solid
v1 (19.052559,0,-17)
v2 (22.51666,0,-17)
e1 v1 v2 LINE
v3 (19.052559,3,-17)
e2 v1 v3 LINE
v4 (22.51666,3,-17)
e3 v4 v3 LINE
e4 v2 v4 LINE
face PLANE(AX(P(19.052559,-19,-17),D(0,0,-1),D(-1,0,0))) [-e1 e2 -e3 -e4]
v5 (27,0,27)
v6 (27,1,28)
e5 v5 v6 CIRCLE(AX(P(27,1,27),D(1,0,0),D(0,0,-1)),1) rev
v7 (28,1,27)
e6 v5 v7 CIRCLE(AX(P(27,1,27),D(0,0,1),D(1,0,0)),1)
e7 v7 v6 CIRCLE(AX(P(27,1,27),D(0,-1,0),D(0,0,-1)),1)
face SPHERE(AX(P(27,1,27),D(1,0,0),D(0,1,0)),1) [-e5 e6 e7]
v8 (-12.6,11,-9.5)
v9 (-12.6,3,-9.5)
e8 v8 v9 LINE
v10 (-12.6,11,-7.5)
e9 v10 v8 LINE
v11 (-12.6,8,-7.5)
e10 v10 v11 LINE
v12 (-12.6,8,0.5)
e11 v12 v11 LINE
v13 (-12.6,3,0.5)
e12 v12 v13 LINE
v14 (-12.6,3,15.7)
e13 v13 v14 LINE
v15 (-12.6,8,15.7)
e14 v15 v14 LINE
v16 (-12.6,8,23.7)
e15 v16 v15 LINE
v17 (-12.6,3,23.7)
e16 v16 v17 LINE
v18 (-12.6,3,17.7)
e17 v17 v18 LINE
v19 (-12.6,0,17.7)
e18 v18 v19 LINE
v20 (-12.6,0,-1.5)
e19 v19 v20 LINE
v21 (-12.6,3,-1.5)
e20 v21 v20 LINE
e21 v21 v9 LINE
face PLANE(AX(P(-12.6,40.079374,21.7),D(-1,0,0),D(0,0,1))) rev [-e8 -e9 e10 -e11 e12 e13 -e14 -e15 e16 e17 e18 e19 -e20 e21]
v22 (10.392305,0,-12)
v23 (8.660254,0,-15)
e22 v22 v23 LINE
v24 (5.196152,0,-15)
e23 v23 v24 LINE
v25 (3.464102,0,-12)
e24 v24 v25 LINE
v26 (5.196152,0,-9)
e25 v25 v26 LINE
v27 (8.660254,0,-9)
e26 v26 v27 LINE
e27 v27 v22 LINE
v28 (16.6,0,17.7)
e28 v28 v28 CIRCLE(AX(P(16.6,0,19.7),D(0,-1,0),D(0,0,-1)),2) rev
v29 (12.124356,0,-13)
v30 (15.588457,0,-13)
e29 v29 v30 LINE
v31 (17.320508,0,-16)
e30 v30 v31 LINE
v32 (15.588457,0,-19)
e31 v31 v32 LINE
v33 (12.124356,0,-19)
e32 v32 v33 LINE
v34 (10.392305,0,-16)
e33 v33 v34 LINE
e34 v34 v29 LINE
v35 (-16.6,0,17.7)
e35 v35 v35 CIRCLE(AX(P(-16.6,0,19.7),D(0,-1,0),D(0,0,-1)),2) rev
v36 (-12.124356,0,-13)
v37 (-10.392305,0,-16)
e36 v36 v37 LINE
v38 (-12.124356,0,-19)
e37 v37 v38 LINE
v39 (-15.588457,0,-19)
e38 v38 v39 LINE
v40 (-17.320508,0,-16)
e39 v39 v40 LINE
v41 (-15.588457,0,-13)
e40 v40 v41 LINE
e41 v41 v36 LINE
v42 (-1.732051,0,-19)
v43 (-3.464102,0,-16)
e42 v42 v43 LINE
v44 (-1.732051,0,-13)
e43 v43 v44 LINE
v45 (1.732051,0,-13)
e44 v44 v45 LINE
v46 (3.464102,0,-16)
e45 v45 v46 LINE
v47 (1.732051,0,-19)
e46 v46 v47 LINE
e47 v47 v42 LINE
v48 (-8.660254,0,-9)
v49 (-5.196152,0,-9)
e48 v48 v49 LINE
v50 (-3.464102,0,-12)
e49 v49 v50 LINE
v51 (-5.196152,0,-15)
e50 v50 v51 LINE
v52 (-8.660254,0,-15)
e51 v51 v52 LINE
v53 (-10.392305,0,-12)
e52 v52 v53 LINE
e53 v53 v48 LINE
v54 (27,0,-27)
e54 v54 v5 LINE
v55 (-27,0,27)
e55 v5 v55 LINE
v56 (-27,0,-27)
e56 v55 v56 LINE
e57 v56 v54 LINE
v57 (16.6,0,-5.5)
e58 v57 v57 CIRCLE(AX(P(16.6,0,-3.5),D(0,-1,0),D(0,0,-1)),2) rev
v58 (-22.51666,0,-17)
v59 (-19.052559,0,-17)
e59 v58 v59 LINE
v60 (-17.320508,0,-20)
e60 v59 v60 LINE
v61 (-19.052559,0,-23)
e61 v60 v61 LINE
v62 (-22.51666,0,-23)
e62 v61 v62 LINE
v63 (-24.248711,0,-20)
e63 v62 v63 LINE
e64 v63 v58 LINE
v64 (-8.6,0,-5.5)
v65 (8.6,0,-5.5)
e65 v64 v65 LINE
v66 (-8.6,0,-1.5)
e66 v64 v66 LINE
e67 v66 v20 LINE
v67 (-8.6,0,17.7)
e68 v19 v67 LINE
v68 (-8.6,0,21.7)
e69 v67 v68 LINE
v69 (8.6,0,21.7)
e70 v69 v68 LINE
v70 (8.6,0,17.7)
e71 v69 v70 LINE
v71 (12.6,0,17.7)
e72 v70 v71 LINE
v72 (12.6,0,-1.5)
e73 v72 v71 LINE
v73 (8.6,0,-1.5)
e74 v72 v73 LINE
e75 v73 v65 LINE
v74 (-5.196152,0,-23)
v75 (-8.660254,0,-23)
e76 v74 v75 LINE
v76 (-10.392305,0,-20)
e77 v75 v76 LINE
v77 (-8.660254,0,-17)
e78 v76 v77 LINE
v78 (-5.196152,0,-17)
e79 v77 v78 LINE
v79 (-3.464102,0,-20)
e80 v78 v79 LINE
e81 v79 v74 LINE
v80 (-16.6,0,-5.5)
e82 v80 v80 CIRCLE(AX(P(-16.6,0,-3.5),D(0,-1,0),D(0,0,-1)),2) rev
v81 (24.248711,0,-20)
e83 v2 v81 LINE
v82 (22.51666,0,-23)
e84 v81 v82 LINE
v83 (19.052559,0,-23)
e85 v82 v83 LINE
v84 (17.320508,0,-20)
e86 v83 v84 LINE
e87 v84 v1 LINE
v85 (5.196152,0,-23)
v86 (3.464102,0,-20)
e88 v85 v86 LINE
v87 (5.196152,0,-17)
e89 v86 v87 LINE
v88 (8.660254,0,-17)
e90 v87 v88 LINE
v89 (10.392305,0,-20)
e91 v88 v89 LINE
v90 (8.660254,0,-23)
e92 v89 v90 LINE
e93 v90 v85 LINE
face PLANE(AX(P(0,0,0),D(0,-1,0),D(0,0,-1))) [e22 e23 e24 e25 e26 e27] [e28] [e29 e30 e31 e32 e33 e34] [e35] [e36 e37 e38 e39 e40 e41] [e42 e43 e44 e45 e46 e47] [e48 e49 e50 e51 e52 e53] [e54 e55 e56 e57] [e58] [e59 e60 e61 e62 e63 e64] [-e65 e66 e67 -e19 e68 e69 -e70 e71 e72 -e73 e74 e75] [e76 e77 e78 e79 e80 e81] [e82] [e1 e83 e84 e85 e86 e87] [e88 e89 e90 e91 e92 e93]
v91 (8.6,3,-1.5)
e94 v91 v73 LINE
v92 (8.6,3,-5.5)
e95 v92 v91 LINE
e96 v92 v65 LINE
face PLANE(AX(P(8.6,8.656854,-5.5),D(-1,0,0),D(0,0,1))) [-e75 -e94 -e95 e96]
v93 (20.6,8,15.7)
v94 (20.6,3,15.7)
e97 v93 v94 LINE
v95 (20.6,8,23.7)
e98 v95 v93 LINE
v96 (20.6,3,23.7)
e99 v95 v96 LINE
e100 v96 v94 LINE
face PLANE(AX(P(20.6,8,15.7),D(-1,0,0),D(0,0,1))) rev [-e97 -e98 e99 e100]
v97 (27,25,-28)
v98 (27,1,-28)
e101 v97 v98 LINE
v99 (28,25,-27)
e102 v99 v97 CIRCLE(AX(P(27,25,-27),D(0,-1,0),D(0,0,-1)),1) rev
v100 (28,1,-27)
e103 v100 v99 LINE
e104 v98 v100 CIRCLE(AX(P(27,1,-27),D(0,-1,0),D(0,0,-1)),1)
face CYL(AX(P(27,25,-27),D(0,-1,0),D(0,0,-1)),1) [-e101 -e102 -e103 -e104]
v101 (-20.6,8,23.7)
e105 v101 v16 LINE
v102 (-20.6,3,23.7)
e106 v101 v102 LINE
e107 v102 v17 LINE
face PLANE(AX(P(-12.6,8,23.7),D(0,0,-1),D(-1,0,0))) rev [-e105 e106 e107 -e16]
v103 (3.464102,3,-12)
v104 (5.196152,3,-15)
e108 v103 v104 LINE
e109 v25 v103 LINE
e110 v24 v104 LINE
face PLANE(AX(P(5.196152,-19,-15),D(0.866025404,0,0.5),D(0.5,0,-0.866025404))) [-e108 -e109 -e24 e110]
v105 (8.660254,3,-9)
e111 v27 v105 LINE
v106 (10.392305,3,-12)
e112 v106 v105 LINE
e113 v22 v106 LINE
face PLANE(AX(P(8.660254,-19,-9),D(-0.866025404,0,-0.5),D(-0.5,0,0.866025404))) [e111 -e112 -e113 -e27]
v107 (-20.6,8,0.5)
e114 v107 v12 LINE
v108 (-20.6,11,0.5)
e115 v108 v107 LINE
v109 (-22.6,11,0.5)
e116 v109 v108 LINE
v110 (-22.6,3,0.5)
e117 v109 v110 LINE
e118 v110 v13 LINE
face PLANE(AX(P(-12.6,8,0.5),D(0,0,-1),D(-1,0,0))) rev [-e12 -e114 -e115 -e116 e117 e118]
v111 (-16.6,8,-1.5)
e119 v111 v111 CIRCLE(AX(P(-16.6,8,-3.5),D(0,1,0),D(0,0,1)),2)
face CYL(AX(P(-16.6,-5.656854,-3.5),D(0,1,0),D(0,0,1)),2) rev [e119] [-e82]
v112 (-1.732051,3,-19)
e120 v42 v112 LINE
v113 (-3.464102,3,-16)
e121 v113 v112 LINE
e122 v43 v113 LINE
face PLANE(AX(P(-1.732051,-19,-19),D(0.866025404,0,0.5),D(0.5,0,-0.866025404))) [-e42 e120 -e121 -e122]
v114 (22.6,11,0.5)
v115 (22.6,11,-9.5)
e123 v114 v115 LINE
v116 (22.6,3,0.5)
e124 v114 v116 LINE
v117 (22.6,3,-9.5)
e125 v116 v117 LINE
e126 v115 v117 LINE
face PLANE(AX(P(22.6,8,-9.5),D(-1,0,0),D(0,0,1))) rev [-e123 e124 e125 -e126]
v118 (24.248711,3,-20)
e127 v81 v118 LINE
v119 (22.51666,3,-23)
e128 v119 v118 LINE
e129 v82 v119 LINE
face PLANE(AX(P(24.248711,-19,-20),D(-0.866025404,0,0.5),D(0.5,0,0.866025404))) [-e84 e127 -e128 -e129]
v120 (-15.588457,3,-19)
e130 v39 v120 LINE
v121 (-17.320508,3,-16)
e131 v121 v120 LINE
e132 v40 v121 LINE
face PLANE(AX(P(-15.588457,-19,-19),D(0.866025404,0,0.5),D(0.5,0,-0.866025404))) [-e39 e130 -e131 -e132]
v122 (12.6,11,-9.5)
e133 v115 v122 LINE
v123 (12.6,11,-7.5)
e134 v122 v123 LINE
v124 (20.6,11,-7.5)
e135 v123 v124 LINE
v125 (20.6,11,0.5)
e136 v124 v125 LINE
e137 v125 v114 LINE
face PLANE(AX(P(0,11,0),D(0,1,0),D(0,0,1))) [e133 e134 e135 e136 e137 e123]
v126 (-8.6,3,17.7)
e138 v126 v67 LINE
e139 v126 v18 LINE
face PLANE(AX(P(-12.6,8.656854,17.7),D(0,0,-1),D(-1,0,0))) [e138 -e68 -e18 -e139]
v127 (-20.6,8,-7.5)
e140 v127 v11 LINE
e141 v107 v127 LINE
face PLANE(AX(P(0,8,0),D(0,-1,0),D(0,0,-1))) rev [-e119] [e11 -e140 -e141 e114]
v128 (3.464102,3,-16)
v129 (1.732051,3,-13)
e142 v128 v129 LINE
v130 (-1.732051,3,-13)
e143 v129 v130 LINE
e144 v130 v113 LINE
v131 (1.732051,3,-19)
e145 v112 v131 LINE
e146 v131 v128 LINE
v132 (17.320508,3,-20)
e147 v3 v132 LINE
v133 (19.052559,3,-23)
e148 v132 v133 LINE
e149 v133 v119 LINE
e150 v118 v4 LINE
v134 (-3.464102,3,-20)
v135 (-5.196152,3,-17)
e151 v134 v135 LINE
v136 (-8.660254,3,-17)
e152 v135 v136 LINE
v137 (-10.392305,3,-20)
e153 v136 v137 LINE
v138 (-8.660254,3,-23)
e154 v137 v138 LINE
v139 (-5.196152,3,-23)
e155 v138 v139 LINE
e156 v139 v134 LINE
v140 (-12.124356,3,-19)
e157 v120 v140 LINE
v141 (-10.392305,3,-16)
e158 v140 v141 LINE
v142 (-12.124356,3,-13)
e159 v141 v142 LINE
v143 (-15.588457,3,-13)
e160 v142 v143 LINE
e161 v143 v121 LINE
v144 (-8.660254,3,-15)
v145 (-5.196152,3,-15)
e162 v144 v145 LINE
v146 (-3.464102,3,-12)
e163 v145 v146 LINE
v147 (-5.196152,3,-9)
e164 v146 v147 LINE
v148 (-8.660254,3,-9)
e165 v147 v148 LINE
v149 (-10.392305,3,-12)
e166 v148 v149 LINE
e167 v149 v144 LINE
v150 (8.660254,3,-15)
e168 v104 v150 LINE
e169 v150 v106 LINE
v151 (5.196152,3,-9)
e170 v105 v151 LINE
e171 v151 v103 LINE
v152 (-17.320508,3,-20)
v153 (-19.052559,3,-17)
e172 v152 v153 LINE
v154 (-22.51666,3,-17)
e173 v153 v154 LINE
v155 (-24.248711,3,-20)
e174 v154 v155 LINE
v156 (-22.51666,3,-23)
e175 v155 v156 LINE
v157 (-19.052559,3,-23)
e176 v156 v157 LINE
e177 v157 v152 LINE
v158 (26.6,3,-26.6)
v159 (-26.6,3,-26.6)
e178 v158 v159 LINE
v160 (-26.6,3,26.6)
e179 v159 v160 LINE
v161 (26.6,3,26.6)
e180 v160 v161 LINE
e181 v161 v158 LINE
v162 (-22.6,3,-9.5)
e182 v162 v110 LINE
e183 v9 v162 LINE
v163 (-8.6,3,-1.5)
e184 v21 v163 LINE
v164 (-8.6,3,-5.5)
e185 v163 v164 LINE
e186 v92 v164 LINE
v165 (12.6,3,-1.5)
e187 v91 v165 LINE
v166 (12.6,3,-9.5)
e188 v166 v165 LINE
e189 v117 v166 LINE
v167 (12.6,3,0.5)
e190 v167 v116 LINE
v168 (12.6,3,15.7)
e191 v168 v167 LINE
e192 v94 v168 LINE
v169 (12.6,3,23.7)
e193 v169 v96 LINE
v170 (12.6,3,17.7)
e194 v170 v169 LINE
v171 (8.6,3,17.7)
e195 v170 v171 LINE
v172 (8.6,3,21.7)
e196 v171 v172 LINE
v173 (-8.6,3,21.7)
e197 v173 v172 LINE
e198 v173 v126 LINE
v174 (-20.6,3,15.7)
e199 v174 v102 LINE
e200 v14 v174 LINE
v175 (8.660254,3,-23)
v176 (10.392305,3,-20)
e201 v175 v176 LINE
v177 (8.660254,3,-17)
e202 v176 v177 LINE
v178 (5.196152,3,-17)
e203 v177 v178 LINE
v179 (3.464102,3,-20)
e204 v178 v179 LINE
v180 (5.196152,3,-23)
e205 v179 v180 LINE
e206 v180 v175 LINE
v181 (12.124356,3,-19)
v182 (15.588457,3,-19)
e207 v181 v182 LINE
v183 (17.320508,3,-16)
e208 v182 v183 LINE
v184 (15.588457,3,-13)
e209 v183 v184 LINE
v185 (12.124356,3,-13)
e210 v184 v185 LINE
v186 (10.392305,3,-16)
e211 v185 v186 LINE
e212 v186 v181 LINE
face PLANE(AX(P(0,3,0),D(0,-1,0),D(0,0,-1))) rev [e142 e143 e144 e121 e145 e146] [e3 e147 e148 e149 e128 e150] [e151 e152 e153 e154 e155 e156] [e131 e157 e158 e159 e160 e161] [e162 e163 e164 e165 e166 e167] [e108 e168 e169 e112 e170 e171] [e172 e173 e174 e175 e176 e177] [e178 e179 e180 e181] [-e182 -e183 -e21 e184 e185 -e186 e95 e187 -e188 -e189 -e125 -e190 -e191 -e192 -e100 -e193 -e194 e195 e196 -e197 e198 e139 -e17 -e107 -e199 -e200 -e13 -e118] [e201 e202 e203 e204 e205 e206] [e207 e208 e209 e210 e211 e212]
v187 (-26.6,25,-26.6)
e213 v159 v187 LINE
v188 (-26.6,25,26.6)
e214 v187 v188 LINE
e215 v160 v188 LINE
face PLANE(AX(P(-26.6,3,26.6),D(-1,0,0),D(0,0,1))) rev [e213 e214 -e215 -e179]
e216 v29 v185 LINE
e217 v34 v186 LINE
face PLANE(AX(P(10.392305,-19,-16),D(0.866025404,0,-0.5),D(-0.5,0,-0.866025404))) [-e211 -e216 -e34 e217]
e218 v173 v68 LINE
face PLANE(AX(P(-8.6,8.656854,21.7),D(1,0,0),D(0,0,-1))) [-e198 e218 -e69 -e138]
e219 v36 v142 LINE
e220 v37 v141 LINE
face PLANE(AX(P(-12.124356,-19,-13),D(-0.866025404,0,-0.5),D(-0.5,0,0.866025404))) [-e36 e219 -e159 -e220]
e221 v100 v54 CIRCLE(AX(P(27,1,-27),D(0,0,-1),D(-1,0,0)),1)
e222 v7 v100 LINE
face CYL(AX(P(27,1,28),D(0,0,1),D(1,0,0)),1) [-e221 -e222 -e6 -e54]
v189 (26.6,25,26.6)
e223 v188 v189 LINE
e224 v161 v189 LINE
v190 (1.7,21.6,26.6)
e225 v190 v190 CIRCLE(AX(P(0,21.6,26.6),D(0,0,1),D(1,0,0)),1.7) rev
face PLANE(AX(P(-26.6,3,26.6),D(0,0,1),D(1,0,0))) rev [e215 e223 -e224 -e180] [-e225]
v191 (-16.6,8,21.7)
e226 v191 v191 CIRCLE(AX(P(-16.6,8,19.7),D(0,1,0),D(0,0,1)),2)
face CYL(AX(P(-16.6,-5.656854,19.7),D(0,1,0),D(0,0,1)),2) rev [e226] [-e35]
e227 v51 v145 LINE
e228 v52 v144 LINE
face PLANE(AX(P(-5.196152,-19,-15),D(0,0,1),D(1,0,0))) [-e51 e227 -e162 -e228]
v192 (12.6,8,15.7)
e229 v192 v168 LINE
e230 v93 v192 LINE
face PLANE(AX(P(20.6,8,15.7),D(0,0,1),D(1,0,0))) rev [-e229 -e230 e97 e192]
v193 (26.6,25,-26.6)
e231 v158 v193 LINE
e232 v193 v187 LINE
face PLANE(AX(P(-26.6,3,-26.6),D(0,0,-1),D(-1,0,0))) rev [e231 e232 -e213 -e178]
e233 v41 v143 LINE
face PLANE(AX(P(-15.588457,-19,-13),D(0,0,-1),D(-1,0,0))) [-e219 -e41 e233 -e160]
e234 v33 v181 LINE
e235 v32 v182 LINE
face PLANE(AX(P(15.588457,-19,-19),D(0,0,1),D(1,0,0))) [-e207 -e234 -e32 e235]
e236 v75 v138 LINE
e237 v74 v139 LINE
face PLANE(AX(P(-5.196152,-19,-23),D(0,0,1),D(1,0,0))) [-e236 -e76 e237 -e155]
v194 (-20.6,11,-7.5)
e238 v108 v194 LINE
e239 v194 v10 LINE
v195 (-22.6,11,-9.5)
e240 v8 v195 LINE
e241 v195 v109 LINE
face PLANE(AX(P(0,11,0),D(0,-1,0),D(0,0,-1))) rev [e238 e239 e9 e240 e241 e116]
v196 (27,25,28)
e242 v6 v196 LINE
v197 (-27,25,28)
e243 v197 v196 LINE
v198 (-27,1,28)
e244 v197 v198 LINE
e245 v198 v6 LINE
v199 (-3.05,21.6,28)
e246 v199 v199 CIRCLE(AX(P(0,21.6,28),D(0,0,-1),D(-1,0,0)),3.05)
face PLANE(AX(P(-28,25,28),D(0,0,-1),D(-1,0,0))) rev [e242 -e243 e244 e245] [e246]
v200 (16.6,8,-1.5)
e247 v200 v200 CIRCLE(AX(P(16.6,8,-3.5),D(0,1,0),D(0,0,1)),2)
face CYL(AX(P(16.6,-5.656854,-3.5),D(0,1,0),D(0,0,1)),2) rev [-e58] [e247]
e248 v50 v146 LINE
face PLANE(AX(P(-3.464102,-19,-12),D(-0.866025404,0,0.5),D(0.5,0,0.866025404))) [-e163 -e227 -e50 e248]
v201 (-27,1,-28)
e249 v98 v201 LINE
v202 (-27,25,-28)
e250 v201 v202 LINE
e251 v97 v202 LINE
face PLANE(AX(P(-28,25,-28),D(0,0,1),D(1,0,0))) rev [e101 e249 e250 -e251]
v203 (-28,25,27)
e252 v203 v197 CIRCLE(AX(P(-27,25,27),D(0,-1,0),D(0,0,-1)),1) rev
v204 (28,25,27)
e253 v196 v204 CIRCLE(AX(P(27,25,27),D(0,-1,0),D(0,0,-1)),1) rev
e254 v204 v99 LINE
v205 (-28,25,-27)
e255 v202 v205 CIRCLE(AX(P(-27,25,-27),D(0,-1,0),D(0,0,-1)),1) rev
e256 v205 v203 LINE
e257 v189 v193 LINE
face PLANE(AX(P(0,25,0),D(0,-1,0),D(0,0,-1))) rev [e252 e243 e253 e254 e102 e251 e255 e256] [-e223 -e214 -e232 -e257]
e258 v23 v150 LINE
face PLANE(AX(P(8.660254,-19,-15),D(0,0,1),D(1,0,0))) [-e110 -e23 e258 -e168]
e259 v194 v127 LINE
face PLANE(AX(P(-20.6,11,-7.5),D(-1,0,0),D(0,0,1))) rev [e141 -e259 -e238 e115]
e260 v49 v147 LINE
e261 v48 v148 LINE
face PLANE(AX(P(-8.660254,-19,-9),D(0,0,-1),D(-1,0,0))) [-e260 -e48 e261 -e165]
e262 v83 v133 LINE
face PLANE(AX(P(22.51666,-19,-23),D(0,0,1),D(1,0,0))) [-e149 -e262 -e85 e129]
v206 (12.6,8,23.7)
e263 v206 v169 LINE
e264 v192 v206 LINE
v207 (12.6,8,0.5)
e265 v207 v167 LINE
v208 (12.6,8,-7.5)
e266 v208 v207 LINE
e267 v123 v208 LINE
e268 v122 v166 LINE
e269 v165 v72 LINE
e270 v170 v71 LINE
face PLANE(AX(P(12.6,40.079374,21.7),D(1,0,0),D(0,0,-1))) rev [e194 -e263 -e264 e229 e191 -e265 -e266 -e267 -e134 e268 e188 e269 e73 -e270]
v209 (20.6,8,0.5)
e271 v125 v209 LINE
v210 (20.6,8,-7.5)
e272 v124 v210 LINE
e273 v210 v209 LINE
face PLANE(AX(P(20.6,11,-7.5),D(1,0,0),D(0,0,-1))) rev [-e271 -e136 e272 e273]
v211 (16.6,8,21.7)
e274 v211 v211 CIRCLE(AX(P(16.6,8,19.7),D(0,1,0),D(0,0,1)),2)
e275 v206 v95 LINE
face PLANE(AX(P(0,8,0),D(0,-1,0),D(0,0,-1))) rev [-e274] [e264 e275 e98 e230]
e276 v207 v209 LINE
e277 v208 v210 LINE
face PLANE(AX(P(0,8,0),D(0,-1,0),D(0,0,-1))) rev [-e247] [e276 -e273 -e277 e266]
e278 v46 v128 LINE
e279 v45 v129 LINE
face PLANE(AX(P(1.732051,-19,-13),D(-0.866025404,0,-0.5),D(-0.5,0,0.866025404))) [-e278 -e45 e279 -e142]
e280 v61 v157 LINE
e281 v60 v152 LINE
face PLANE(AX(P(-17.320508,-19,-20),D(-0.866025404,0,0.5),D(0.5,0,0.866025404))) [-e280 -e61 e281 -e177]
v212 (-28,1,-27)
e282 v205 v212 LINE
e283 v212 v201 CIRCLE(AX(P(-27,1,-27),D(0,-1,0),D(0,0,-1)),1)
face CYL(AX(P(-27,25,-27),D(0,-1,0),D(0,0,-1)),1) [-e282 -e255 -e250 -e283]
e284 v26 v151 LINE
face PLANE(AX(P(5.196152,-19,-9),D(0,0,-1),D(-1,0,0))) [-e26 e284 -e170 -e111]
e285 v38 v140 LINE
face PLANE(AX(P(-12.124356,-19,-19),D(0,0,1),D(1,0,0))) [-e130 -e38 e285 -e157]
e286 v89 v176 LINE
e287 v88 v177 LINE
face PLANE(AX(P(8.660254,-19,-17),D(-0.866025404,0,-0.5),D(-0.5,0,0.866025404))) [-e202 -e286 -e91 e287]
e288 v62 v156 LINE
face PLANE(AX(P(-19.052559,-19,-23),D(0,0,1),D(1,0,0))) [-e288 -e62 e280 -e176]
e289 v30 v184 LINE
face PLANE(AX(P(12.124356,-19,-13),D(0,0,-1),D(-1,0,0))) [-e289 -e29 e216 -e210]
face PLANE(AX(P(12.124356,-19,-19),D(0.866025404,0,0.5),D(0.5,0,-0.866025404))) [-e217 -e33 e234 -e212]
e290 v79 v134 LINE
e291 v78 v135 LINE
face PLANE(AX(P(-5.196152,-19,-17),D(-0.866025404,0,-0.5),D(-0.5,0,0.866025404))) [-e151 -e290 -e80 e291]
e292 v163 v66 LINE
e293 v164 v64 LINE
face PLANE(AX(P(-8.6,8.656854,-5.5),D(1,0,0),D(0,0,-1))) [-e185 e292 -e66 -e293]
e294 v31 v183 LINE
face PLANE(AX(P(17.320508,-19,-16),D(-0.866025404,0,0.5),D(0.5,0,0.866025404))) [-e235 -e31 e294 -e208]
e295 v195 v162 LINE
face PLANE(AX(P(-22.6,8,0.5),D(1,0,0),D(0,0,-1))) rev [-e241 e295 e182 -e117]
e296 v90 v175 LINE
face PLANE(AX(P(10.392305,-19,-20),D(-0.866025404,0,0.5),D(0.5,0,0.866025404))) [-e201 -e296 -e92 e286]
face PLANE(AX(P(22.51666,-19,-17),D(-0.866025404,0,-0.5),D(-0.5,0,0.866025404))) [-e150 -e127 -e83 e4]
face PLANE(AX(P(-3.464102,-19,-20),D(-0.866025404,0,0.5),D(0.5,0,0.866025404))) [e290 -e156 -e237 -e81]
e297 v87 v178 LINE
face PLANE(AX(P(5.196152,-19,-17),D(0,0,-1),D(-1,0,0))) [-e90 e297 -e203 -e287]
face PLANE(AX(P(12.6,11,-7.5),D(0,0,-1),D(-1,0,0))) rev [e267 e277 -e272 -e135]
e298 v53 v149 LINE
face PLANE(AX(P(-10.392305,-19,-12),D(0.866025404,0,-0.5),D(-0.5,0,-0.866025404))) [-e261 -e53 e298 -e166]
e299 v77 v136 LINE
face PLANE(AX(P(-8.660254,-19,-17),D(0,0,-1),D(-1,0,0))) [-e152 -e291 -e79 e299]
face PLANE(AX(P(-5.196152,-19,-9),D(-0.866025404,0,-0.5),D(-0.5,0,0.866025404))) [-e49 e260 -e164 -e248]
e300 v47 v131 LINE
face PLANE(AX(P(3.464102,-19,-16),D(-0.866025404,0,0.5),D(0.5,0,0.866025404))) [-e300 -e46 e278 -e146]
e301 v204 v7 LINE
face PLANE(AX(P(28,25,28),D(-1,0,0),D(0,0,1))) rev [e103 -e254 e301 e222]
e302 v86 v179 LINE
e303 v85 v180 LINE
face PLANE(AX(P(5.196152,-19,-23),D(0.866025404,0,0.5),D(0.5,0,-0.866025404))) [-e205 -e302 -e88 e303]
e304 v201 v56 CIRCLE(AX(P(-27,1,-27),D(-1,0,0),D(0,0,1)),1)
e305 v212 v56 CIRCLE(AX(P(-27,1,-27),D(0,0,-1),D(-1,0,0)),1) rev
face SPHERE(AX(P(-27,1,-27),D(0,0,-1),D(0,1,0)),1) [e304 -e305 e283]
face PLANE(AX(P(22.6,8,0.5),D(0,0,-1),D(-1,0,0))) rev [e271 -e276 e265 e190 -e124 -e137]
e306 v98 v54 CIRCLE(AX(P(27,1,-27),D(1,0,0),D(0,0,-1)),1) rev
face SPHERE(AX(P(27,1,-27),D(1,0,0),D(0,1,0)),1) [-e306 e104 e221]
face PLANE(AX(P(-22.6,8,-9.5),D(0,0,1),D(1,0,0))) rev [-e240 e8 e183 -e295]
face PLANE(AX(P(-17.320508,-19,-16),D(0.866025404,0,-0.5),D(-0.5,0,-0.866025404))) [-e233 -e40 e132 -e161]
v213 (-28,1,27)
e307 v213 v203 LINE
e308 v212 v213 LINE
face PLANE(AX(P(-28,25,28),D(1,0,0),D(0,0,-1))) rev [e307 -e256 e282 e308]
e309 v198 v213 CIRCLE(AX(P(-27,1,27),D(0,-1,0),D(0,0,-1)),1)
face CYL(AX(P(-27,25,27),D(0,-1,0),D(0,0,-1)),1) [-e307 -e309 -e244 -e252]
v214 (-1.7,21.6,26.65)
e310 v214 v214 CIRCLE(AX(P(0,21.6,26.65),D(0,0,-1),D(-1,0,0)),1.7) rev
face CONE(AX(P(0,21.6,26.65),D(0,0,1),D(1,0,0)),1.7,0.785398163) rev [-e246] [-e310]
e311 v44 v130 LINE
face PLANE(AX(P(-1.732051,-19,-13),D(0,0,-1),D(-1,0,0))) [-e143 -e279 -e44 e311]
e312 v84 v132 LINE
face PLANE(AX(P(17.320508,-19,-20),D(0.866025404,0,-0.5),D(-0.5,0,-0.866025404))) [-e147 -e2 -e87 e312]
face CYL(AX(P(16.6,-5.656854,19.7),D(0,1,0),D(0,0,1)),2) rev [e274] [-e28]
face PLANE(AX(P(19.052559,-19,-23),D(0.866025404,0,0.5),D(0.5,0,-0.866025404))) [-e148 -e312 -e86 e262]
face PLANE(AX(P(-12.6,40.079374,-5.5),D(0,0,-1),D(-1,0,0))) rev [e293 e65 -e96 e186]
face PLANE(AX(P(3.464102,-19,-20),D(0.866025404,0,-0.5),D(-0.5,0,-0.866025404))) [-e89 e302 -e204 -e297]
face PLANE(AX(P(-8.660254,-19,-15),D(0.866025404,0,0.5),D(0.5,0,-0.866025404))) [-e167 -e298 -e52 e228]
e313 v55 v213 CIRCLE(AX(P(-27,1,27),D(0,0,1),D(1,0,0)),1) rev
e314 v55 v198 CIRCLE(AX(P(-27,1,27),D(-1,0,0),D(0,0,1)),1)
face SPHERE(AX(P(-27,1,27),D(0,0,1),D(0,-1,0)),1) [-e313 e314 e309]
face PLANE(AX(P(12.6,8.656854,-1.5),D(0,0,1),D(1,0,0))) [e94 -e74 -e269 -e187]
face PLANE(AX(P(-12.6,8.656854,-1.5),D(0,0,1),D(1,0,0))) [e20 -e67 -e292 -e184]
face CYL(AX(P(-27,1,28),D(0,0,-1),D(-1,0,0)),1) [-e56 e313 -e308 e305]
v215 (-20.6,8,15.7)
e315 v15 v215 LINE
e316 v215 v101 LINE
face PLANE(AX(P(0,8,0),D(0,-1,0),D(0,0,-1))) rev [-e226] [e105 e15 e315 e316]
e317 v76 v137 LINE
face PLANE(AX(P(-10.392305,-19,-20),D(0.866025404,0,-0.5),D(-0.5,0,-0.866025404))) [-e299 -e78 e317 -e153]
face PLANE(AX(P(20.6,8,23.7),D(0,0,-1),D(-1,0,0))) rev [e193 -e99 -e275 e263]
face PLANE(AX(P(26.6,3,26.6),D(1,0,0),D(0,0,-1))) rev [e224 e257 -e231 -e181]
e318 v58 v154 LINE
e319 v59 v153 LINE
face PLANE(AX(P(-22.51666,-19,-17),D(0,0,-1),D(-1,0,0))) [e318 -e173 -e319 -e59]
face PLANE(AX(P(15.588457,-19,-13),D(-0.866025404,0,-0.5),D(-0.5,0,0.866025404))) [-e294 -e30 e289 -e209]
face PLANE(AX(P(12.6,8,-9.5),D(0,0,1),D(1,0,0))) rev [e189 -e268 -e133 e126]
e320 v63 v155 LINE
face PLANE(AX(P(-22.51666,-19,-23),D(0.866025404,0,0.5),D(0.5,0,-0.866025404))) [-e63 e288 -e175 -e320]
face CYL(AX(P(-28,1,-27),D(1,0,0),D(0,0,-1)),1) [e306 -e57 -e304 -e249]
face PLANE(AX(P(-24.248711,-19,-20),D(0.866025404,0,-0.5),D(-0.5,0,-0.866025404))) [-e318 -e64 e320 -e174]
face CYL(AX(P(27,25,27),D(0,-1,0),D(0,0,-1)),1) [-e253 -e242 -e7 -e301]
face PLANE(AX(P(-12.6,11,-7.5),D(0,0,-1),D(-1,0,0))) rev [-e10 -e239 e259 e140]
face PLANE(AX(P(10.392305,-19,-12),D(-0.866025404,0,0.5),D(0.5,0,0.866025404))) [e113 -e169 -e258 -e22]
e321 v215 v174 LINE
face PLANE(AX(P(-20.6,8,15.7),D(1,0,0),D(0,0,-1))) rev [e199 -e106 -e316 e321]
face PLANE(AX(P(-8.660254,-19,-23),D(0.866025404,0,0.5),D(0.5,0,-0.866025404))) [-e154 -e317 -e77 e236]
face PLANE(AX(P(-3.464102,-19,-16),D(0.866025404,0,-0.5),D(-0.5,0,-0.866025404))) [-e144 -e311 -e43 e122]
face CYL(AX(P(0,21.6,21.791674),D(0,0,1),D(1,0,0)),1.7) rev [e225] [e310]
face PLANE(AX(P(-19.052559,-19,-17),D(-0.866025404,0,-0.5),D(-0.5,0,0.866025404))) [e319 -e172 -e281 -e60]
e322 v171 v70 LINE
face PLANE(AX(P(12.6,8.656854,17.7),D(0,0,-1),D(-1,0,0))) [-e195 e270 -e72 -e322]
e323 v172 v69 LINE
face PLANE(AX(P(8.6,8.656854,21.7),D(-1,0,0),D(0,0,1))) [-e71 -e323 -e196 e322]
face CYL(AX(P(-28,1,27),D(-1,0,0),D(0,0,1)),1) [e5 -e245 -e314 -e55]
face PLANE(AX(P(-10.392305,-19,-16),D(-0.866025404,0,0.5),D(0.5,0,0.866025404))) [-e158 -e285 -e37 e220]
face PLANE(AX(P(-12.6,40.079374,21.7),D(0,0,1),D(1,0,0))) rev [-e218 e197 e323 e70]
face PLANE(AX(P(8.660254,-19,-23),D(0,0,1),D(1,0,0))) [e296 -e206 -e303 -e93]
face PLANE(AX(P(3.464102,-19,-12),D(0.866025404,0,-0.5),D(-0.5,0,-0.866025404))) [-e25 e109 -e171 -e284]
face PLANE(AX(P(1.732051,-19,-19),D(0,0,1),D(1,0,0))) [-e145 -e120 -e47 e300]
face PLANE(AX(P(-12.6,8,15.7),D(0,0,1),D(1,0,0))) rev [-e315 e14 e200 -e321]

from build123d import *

# Parameters (mm, degrees)
SKETCH1_W           = 56
SKETCH1_H           = 56
BOSS_EXTRUDE1_DEPTH = 25
SKETCH2_W           = 53.2
SKETCH2_H           = 53.2
CUT_EXTRUDE1_DEPTH  = 22
SKETCH3_R           = 1.7
CUT_EXTRUDE2_DEPTH  = 1.4
SKETCH4_W           = 25.2
SKETCH4_H           = 27.2
CUT_EXTRUDE3_DEPTH  = 3
SKETCH5_W           = 4
SKETCH5_H           = 4
BOSS_EXTRUDE2_DEPTH = 3
SKETCH6_W           = 8
SKETCH6_H           = 8
BOSS_EXTRUDE3_DEPTH = 5
SKETCH7_R           = 2
CUT_EXTRUDE4_DEPTH  = 8
BOSS_EXTRUDE4_DEPTH = 3
FILLET1_R           = 1
CHAMFER1_SIZE       = 1.35
FILL_PATTERN1_DEPTH = 3


# Read off the part's stored shape, not the designer's step: Fill Pattern1
with BuildPart() as part:
    # Sketch1 → Boss-Extrude1 (new body)
    with BuildSketch(Plane(origin=(0, 0, 0), x_dir=(1, 0, 0), z_dir=(0, 1, 0))):
        Rectangle(SKETCH1_W, SKETCH1_H)
    extrude(amount=BOSS_EXTRUDE1_DEPTH)

    # Sketch2 → Cut-Extrude1 (cut)
    with BuildSketch(Plane(origin=(0, 25, 0), x_dir=(1, 0, 0), z_dir=(0, 1, 0))):
        Rectangle(SKETCH2_W, SKETCH2_H)
    extrude(amount=-CUT_EXTRUDE1_DEPTH, mode=Mode.SUBTRACT)

    # Sketch3 → Cut-Extrude2 (cut)
    with BuildSketch(Plane.XY.offset(28)):
        with Locations((0, 21.6)):
            Circle(SKETCH3_R)
    extrude(amount=-CUT_EXTRUDE2_DEPTH, mode=Mode.SUBTRACT)

    # Sketch4 → Cut-Extrude3 (cut)
    with BuildSketch(Plane.XZ):
        with Locations((0, 8.1)):
            Rectangle(SKETCH4_W, SKETCH4_H)
    extrude(amount=-CUT_EXTRUDE3_DEPTH, mode=Mode.SUBTRACT)

    # Sketch5 → Boss-Extrude2 (add)
    with BuildSketch(Plane.XZ):
        with Locations((-10.6, 19.7)):
            Rectangle(SKETCH5_W, SKETCH5_H)
        with Locations((10.6, 19.7)):
            Rectangle(SKETCH5_W, SKETCH5_H)
        with Locations((10.6, -3.5)):
            Rectangle(SKETCH5_W, SKETCH5_H)
        with Locations((-10.6, -3.5)):
            Rectangle(SKETCH5_W, SKETCH5_H)
    extrude(amount=-BOSS_EXTRUDE2_DEPTH)

    # Sketch6 → Boss-Extrude3 (add)
    with BuildSketch(Plane(origin=(0, 3, 0), x_dir=(1, 0, 0), z_dir=(0, 1, 0))):
        with Locations((16.6, -19.7)):
            Rectangle(SKETCH6_W, SKETCH6_H)
        with Locations((-16.6, -19.7)):
            Rectangle(SKETCH6_W, SKETCH6_H)
        Polygon((12.6, -0.5), (20.6, -0.5), (22.6, -0.5), (22.6, 9.5), (12.6, 9.5), (12.6, 7.5), align=None)
        Polygon((-12.6, -0.5), (-20.6, -0.5), (-22.6, -0.5), (-22.6, 9.5), (-12.6, 9.5), (-12.6, 7.5), align=None)
    extrude(amount=BOSS_EXTRUDE3_DEPTH)

    # Sketch7 → Cut-Extrude4 (cut)
    with BuildSketch(Plane(origin=(0, 8, 0), x_dir=(1, 0, 0), z_dir=(0, 1, 0))):
        with Locations(Location((16.6, -19.7, 0), (0, 0, 270))):
            Circle(SKETCH7_R)
        with Locations(Location((-16.6, -19.7, 0), (0, 0, 270))):
            Circle(SKETCH7_R)
        with Locations(Location((16.6, 3.5, 0), (0, 0, 270))):
            Circle(SKETCH7_R)
        with Locations(Location((-16.6, 3.5, 0), (0, 0, 270))):
            Circle(SKETCH7_R)
    extrude(amount=-CUT_EXTRUDE4_DEPTH, mode=Mode.SUBTRACT)

    # Sketch9 → Boss-Extrude4 (add)
    with BuildSketch(Plane(origin=(0, 8, 0), x_dir=(1, 0, 0), z_dir=(0, 1, 0))):
        Polygon((-22.6, -0.5), (-22.6, 9.5), (-12.6, 9.5), (-12.6, 7.5), (-20.6, 7.5), (-20.6, -0.5), align=None)
        Polygon((12.6, 9.5), (22.6, 9.5), (22.6, -0.5), (20.6, -0.5), (20.6, 7.5), (12.6, 7.5), align=None)
    extrude(amount=BOSS_EXTRUDE4_DEPTH)

    # Fillet1
    fillet1_edges = [part.edges().sort_by_distance(p)[0] for p in [
        (0, 0, 28),
        (-28, 0, 0),
        (0, 0, -28),
        (28, 0, 0),
        (28, 12.5, 28),
        (-28, 12.5, 28),
        (-28, 12.5, -28),
        (28, 12.5, -28),
    ]]
    fillet(fillet1_edges, radius=FILLET1_R)

    # Chamfer1
    chamfer1_edges = [part.edges().sort_by_distance(p)[0] for p in [
        (-1.7, 21.6, 28),
    ]]
    chamfer(chamfer1_edges, length=CHAMFER1_SIZE)

    # Fill Pattern1 outline → Fill Pattern1 (cut)
    with BuildSketch(Plane(origin=(0, 0, 0), x_dir=(1, 0, 0), z_dir=(0, 1, 0))):
        Polygon((22.516660498, 17), (24.248711306, 20), (22.516660498, 23), (19.052558883, 23), (17.320508076, 20), (19.052558883, 17), align=None)
        Polygon((8.660254038, 23), (5.196152423, 23), (3.464101615, 20), (5.196152423, 17), (8.660254038, 17), (10.392304845, 20), align=None)
        Polygon((-5.196152423, 23), (-8.660254038, 23), (-10.392304845, 20), (-8.660254038, 17), (-5.196152423, 17), (-3.464101615, 20), align=None)
        Polygon((-19.052558883, 23), (-22.516660498, 23), (-24.248711306, 20), (-22.516660498, 17), (-19.052558883, 17), (-17.320508076, 20), align=None)
        Polygon((1.732050808, 13), (3.464101615, 16), (1.732050808, 19), (-1.732050808, 19), (-3.464101615, 16), (-1.732050808, 13), align=None)
        Polygon((-12.124355653, 19), (-15.588457268, 19), (-17.320508076, 16), (-15.588457268, 13), (-12.124355653, 13), (-10.392304845, 16), align=None)
        Polygon((15.588457268, 19), (12.124355653, 19), (10.392304845, 16), (12.124355653, 13), (15.588457268, 13), (17.320508076, 16), align=None)
        Polygon((8.660254038, 9), (10.392304845, 12), (8.660254038, 15), (5.196152423, 15), (3.464101615, 12), (5.196152423, 9), align=None)
        Polygon((-5.196152423, 15), (-8.660254038, 15), (-10.392304845, 12), (-8.660254038, 9), (-5.196152423, 9), (-3.464101615, 12), align=None)
    extrude(amount=FILL_PATTERN1_DEPTH, mode=Mode.SUBTRACT)


solid = part.part
